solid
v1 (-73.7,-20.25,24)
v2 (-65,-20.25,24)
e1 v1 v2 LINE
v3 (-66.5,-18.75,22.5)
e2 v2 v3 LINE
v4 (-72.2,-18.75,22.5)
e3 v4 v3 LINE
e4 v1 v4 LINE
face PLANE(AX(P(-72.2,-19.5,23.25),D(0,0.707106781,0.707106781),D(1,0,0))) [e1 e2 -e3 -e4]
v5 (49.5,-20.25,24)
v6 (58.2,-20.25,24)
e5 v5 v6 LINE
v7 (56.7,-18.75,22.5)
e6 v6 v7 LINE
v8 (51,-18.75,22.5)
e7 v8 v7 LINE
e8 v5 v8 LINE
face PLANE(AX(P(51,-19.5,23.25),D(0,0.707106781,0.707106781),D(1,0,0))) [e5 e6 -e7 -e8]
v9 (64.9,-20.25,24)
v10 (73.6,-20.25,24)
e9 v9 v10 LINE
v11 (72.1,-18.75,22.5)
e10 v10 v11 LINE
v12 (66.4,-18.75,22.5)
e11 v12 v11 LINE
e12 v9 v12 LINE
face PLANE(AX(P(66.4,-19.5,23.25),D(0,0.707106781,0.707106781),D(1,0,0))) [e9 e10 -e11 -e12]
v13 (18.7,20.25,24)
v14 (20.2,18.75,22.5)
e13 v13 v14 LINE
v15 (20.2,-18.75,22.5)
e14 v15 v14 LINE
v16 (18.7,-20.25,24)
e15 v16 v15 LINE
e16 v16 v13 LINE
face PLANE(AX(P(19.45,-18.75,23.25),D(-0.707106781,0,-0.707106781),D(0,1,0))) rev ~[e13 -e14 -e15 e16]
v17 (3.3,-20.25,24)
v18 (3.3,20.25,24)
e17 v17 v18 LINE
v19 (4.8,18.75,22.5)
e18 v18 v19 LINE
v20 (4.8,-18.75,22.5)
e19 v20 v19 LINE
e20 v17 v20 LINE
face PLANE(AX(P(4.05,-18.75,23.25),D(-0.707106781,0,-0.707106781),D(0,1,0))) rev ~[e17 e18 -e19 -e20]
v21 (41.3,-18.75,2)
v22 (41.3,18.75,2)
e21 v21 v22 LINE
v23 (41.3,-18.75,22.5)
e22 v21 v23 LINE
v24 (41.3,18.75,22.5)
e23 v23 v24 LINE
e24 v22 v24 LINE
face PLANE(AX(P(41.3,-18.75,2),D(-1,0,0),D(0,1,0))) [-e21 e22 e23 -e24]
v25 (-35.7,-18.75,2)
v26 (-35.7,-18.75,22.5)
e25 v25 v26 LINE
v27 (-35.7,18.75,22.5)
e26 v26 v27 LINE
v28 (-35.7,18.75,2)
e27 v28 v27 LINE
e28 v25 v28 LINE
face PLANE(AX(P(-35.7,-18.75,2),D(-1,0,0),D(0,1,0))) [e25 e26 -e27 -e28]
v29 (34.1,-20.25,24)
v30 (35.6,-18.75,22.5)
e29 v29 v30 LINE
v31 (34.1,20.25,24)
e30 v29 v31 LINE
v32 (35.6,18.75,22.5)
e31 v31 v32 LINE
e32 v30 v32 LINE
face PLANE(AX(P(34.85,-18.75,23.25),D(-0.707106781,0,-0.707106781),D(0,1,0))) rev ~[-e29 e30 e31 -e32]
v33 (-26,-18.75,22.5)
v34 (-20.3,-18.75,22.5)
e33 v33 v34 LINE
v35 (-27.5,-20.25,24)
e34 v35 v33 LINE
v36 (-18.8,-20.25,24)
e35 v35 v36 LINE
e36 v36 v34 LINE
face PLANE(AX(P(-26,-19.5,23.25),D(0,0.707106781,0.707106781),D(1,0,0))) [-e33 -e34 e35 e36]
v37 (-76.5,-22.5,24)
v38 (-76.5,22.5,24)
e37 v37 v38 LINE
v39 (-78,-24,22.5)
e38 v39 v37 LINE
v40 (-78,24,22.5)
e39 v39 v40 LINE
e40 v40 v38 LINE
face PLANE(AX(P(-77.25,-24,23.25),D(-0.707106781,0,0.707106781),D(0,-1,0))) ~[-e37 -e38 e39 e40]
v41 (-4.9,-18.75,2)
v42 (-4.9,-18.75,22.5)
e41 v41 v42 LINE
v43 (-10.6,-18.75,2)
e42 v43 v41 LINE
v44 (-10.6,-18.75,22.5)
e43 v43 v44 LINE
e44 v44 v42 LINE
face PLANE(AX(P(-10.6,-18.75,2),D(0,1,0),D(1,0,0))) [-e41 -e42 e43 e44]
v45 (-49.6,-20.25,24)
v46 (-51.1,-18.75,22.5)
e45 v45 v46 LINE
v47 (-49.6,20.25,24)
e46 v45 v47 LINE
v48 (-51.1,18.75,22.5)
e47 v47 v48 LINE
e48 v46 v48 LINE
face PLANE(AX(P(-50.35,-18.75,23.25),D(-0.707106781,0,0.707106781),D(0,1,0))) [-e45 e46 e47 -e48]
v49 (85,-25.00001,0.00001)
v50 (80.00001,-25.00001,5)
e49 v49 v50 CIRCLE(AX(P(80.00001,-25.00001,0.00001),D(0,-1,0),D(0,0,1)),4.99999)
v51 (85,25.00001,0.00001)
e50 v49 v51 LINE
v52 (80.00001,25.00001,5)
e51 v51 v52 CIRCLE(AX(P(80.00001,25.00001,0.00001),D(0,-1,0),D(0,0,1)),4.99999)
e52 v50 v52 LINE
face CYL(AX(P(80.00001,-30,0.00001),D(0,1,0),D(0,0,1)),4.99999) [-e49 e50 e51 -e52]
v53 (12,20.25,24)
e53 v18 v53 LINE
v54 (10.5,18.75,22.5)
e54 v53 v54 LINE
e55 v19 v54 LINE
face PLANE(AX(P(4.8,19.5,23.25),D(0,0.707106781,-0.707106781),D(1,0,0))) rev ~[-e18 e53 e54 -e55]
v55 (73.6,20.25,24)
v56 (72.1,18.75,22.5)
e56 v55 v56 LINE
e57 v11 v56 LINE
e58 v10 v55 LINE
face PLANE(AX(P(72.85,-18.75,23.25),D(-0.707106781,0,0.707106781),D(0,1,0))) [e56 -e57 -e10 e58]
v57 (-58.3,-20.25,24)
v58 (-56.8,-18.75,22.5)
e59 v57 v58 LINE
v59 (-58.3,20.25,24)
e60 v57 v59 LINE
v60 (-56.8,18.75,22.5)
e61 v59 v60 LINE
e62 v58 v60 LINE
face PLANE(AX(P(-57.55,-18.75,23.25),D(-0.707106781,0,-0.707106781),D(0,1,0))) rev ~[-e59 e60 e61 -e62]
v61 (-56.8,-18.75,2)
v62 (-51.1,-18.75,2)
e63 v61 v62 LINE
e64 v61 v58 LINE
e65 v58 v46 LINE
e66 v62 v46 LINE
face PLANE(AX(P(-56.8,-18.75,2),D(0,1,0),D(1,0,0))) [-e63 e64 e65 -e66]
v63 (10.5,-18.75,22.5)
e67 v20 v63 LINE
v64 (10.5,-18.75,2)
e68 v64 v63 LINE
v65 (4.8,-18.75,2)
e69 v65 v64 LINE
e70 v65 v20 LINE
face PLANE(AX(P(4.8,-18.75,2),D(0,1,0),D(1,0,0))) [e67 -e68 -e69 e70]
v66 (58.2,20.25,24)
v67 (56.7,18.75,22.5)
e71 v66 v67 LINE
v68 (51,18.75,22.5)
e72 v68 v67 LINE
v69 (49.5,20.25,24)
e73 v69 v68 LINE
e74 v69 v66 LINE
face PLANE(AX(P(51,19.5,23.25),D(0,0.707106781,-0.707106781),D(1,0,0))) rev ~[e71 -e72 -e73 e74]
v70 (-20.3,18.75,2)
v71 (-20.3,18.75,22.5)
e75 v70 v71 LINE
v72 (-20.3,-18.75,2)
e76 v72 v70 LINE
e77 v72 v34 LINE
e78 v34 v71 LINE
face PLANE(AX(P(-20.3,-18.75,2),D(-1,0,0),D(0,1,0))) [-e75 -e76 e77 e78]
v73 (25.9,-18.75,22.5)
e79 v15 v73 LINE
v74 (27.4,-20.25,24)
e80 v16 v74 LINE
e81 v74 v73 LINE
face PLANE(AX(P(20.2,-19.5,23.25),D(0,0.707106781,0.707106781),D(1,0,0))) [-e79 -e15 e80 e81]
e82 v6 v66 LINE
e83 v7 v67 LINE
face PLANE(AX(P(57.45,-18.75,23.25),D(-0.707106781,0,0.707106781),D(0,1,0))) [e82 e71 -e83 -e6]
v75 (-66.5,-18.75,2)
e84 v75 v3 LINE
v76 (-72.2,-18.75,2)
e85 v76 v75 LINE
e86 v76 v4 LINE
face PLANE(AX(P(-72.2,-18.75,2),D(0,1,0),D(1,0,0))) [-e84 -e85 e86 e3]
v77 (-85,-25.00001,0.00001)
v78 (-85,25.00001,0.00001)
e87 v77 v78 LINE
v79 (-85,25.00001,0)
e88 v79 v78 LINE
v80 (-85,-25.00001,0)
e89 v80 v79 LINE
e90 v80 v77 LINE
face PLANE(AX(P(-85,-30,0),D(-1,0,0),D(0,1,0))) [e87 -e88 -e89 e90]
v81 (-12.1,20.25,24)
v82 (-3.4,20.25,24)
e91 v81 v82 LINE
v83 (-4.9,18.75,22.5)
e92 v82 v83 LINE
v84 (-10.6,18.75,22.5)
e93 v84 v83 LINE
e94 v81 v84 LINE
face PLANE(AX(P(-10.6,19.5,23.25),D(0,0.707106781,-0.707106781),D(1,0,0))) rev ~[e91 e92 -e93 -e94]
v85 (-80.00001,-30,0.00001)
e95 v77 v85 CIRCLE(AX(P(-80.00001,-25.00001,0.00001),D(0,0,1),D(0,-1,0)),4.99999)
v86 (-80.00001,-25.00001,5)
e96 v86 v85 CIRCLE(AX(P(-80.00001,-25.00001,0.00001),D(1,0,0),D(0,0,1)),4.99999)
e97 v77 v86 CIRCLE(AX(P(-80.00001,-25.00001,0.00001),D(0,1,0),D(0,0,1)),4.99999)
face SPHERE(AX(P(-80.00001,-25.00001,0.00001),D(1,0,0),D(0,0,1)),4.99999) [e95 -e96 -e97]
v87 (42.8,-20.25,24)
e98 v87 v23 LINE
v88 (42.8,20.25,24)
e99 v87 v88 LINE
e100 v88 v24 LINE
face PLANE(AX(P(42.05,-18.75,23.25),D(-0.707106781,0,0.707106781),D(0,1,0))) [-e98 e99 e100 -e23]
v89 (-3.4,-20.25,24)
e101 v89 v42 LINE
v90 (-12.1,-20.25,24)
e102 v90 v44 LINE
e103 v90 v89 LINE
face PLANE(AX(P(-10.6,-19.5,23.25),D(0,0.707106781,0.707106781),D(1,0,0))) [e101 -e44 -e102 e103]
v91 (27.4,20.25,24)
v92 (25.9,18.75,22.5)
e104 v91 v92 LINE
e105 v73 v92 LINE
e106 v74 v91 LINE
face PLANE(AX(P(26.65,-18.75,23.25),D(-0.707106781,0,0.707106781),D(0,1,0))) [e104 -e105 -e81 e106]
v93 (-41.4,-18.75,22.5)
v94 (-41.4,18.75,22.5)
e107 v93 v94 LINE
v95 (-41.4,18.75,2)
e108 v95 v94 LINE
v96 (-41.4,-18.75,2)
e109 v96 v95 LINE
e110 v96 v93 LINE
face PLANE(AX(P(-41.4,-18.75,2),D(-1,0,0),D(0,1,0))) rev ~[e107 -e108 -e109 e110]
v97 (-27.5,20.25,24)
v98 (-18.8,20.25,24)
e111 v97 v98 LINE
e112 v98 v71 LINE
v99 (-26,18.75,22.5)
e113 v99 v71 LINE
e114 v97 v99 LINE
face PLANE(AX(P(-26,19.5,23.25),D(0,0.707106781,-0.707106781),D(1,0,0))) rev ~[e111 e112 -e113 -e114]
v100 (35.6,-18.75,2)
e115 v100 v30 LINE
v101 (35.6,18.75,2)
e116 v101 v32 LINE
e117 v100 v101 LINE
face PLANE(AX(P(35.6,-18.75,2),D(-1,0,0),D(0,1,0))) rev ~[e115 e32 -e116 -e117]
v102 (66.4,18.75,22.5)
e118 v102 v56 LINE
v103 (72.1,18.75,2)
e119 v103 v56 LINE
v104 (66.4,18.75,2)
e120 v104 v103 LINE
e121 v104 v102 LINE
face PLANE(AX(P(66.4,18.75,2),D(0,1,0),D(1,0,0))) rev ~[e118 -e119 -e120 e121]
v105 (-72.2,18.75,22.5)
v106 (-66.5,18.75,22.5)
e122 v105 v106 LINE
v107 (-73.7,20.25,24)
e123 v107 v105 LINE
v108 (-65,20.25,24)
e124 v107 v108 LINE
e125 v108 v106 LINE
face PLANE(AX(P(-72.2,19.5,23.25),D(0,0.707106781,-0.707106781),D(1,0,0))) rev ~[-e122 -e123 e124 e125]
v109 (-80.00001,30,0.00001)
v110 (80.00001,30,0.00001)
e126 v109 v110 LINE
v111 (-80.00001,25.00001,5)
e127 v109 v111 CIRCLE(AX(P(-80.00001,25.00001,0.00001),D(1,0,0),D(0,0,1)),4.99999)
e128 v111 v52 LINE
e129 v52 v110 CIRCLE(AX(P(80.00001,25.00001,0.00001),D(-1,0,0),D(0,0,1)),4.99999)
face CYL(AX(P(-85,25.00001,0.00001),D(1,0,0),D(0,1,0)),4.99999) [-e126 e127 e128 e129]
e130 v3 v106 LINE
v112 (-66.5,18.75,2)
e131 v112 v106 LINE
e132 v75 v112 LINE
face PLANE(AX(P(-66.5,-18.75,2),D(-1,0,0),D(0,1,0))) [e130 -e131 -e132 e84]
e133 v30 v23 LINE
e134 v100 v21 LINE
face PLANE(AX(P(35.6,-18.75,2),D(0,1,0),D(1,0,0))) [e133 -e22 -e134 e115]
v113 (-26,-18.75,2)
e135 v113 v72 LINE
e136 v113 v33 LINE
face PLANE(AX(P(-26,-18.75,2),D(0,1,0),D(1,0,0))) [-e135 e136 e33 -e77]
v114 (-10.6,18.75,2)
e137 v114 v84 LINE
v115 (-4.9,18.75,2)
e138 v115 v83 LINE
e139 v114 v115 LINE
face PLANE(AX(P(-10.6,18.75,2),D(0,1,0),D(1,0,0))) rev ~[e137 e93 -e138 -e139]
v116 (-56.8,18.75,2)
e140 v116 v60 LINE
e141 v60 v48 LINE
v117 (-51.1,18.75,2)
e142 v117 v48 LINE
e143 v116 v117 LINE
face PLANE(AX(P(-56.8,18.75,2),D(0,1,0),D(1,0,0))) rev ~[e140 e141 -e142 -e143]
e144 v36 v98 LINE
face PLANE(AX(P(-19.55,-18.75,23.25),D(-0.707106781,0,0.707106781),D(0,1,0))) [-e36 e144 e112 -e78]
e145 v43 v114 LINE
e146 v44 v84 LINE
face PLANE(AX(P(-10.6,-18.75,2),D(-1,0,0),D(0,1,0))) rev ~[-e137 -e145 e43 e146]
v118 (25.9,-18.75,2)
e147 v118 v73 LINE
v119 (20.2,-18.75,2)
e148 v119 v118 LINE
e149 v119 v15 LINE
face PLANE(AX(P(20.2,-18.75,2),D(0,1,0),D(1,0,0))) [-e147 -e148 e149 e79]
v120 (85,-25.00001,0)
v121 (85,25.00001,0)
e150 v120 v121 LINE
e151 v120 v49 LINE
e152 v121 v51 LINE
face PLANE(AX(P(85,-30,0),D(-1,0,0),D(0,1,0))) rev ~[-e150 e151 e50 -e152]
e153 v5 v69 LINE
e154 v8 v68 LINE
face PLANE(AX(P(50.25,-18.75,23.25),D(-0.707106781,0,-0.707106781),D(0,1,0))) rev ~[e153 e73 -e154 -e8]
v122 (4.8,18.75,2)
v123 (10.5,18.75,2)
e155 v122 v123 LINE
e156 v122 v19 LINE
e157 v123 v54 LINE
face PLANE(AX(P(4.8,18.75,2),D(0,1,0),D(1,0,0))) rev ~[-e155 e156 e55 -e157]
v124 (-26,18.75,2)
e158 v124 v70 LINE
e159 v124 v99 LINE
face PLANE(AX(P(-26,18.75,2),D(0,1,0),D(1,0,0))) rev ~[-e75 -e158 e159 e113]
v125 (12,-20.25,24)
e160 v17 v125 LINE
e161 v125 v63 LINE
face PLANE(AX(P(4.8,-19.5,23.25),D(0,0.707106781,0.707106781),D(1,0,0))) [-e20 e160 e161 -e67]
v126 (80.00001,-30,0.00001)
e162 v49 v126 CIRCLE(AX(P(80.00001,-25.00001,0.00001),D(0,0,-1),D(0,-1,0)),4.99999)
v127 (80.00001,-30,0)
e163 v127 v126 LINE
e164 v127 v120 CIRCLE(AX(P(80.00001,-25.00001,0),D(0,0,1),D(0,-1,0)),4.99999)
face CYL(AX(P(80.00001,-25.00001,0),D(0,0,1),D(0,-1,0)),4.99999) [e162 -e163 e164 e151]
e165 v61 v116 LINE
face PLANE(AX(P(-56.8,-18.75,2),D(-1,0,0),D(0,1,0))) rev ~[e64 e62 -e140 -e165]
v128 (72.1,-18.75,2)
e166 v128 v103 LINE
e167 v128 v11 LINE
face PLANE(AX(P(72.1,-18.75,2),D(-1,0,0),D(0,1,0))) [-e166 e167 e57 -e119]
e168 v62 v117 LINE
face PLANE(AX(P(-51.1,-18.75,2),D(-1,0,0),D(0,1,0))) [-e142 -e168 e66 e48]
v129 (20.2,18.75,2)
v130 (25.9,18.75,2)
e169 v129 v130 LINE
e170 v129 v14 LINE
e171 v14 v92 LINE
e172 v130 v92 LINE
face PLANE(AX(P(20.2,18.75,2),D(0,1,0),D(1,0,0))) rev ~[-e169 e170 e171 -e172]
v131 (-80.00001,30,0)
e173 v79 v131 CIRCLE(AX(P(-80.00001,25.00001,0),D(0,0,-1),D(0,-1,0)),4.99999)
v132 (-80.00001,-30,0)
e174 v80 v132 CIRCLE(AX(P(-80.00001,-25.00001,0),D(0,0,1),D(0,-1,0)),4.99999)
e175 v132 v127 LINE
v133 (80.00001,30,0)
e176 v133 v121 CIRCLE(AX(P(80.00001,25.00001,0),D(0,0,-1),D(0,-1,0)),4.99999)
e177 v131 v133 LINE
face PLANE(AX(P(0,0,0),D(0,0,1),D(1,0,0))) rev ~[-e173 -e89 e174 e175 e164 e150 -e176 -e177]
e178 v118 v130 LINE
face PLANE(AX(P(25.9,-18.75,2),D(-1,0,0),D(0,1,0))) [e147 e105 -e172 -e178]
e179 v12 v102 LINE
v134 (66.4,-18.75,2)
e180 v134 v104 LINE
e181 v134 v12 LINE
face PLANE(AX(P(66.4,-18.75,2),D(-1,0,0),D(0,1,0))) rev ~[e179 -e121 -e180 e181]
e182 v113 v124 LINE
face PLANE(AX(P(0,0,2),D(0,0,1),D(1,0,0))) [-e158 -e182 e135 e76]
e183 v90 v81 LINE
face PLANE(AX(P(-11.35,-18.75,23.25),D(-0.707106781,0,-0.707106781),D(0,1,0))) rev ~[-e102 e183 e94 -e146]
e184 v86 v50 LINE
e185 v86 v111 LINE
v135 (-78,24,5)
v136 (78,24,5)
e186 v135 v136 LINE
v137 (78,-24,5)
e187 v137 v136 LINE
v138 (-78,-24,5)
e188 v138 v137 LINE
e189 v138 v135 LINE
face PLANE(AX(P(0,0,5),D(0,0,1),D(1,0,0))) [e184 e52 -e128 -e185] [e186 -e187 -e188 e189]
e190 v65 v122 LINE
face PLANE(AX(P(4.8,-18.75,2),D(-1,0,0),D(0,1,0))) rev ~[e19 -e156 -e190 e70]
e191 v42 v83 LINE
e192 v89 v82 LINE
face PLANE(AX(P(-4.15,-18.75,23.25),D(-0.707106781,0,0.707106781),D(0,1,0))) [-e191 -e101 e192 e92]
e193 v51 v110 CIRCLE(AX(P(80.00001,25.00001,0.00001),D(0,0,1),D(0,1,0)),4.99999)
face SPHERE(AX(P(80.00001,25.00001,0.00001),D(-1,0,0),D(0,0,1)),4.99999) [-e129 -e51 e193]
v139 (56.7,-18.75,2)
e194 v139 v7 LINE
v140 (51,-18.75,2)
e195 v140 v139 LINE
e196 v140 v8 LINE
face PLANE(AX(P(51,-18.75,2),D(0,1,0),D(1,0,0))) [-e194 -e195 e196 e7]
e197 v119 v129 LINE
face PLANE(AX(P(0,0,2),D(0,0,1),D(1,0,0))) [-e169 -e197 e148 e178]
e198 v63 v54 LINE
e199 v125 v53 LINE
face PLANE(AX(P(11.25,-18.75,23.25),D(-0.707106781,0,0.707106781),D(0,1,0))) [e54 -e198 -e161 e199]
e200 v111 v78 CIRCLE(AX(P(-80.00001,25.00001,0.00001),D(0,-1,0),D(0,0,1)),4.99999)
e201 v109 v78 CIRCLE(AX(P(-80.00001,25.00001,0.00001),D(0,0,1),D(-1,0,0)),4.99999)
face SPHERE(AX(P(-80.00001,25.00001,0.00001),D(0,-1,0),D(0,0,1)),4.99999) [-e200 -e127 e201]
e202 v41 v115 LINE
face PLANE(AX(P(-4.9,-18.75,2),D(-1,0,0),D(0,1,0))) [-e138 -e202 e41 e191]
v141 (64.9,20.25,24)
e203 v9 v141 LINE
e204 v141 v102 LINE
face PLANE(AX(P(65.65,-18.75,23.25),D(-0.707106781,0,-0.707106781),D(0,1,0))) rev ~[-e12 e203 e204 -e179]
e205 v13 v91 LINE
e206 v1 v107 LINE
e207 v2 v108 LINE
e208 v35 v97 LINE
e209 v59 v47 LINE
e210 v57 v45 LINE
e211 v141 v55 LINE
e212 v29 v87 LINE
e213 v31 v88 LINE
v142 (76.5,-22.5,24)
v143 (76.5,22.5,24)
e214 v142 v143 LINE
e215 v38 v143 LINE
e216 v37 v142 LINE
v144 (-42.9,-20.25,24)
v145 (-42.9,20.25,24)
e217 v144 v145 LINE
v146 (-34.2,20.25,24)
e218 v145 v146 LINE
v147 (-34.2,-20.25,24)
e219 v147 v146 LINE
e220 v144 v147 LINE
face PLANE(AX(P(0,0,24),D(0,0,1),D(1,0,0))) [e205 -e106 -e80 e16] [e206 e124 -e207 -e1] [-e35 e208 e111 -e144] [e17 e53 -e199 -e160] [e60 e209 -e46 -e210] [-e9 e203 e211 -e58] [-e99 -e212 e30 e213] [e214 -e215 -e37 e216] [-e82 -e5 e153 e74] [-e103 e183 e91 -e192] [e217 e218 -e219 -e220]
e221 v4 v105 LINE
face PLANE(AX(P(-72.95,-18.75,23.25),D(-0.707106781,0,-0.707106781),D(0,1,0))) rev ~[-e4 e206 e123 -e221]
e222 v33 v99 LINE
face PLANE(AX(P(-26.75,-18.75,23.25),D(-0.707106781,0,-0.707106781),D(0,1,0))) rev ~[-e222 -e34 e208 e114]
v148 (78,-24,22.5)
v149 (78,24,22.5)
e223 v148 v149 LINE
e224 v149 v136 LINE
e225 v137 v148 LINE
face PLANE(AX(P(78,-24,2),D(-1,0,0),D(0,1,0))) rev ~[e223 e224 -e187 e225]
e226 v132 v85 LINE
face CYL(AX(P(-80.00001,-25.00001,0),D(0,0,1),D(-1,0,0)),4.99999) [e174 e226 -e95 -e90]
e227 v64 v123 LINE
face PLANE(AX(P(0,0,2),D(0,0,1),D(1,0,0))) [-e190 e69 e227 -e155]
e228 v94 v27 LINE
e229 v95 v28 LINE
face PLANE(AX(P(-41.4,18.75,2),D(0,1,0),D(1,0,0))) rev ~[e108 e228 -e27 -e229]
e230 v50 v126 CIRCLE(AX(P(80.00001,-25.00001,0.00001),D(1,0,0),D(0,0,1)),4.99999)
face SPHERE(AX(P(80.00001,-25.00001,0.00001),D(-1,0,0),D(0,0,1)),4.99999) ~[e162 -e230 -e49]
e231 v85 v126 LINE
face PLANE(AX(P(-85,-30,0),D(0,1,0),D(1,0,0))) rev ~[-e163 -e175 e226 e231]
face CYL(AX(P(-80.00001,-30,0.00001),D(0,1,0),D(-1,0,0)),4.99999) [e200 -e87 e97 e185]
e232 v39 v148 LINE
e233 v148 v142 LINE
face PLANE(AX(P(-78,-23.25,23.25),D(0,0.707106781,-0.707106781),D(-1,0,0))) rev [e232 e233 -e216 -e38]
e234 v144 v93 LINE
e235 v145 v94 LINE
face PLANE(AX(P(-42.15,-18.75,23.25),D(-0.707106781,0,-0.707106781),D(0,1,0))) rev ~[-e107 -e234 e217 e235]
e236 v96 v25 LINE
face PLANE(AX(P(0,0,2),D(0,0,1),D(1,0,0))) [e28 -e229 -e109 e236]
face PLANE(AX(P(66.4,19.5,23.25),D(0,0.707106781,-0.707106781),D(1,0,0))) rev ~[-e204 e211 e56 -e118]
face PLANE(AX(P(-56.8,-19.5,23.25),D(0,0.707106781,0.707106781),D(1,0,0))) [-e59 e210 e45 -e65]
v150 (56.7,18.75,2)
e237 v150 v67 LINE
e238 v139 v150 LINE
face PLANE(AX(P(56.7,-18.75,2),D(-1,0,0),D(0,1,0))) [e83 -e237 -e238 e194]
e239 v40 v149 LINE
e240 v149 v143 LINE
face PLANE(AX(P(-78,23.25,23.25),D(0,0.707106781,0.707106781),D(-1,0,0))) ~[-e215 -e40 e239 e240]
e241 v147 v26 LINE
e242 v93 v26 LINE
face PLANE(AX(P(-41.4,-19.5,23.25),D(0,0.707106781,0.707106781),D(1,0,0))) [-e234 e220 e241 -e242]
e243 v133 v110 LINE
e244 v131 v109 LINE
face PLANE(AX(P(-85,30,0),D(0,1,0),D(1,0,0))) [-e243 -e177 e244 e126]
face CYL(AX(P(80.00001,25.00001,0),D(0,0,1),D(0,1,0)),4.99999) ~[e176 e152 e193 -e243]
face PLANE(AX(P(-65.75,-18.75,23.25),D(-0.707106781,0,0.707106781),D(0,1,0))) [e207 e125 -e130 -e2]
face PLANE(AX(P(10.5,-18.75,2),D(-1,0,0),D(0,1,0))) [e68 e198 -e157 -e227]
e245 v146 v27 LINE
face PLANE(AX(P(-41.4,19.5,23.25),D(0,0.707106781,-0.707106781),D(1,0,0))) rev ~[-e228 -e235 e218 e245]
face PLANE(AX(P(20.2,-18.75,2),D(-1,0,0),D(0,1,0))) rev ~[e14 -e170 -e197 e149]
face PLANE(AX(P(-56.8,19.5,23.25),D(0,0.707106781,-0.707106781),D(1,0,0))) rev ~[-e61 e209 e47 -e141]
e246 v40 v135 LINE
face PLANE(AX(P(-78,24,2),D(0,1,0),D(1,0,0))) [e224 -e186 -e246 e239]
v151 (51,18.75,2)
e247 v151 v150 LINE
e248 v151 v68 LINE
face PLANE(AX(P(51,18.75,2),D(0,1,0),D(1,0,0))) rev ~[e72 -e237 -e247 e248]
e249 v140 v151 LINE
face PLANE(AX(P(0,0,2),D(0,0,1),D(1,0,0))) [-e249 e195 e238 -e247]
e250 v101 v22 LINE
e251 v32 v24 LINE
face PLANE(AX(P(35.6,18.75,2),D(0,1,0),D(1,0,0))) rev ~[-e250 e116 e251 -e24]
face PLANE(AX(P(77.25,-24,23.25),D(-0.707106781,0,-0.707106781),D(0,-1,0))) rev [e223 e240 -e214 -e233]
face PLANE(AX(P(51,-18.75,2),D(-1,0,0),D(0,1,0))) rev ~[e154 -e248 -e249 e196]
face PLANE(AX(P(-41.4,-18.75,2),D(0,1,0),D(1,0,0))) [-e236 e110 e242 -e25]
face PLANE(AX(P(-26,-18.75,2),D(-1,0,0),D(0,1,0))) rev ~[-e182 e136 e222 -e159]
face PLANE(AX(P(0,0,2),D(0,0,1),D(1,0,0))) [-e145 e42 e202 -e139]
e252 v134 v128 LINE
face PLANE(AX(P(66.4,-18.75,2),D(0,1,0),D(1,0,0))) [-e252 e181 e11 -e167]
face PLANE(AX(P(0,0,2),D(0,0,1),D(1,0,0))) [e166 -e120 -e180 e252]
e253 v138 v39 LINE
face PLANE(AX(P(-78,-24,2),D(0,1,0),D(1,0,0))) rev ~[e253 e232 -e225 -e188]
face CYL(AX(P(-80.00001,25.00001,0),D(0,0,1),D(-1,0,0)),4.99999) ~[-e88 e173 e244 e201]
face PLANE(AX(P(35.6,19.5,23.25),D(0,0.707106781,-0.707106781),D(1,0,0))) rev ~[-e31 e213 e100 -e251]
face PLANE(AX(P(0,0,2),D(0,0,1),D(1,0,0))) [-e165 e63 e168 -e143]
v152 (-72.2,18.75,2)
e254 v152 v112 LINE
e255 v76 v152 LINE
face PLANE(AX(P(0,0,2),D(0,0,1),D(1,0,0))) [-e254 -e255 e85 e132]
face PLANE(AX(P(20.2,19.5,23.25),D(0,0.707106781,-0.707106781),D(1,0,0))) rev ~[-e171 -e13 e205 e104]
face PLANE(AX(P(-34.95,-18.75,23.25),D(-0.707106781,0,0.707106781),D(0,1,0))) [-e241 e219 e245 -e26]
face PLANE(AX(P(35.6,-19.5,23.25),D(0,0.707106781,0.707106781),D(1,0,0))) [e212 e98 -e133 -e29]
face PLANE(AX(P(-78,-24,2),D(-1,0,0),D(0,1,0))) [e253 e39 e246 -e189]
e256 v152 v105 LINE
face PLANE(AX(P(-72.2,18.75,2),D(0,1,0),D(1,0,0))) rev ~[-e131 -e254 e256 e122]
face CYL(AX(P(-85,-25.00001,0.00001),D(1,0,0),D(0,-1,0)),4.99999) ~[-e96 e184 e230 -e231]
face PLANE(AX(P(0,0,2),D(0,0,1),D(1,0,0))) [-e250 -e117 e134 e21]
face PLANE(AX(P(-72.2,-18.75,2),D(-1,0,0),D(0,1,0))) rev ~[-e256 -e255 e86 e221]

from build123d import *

# Parameters (mm, degrees)
F0_W     = 156
F0_H     = 48
F1_DEPTH = 2
F2_W     = 156
F2_H     = 48
F2_W_2   = 5.7
F2_H_2   = 37.5
F3_DEPTH = 22
F0_W_2   = 170
F0_H_2   = 60
F4_DEPTH = 5
F5_R     = 4.99999
F6_SIZE  = 1.5


# Not quite as in the source:
# - a fillet or chamfer is up to 0.001 mm smaller than in the source, because OpenCascade refuses the exact size


with BuildPart() as f1:
    # F0 (on Top) → F1 (new body)
    with BuildSketch(Plane.XY):
        Rectangle(F0_W, F0_H)
    extrude(amount=F1_DEPTH)

    # F2 (on face) → F3 (join)
    with BuildSketch(Plane.XY.offset(2)):
        Rectangle(F2_W, F2_H)
        with Locations((-69.35, 0)):
            Rectangle(F2_W_2, F2_H_2, mode=Mode.SUBTRACT)
        with Locations((-53.95, 0)):
            Rectangle(F2_W_2, F2_H_2, mode=Mode.SUBTRACT)
        with Locations((-38.55, 0)):
            Rectangle(F2_W_2, F2_H_2, mode=Mode.SUBTRACT)
        with Locations((-23.15, 0)):
            Rectangle(F2_W_2, F2_H_2, mode=Mode.SUBTRACT)
        with Locations((-7.75, 0)):
            Rectangle(F2_W_2, F2_H_2, mode=Mode.SUBTRACT)
        with Locations((7.65, 0)):
            Rectangle(F2_W_2, F2_H_2, mode=Mode.SUBTRACT)
        with Locations((23.05, 0)):
            Rectangle(F2_W_2, F2_H_2, mode=Mode.SUBTRACT)
        with Locations((38.45, 0)):
            Rectangle(F2_W_2, F2_H_2, mode=Mode.SUBTRACT)
        with Locations((53.85, 0)):
            Rectangle(F2_W_2, F2_H_2, mode=Mode.SUBTRACT)
        with Locations((69.25, 0)):
            Rectangle(F2_W_2, F2_H_2, mode=Mode.SUBTRACT)
    extrude(amount=F3_DEPTH)

    # F0 (on Top) → F4 (join)
    with BuildSketch(Plane.XY):
        Rectangle(F0_W_2, F0_H_2)
        Rectangle(F0_W, F0_H, mode=Mode.SUBTRACT)
    extrude(amount=F4_DEPTH)

    # F5 (radius 5 in the source; OpenCascade refuses exactly that, so slightly less here)
    f5_edges = [f1.edges().sort_by_distance(p)[0] for p in [
        (0, -30, 5),
        (-85, 0, 5),
        (0, 30, 5),
        (85, 0, 5),
        (85, -30, 2.5),
        (85, 30, 2.5),
        (-85, -30, 2.5),
        (-85, 30, 2.5),
    ]]
    fillet(f5_edges, radius=F5_R)

    # F6
    f6_edges = [f1.edges().sort_by_distance(p)[0] for p in [
        (0, -24, 24),
        (-78, 0, 24),
        (0, 24, 24),
        (78, 0, 24),
        (-72.2, 0, 24),
        (-66.5, 0, 24),
        (-69.35, -18.75, 24),
        (-69.35, 18.75, 24),
        (-53.95, -18.75, 24),
        (-51.1, 0, 24),
        (-56.8, 0, 24),
        (-53.95, 18.75, 24),
        (-38.55, 18.75, 24),
        (-41.4, 0, 24),
        (-38.55, -18.75, 24),
        (-35.7, 0, 24),
        (-26, 0, 24),
        (-20.3, 0, 24),
        (-23.15, -18.75, 24),
        (-23.15, 18.75, 24),
        (-10.6, 0, 24),
        (-7.75, 18.75, 24),
        (-4.9, 0, 24),
        (-7.75, -18.75, 24),
        (7.65, -18.75, 24),
        (4.8, 0, 24),
        (10.5, 0, 24),
        (7.65, 18.75, 24),
        (20.2, 0, 24),
        (23.05, 18.75, 24),
        (25.9, 0, 24),
        (23.05, -18.75, 24),
        (38.45, -18.75, 24),
        (35.6, 0, 24),
        (41.3, 0, 24),
        (38.45, 18.75, 24),
        (51, 0, 24),
        (53.85, -18.75, 24),
        (56.7, 0, 24),
        (53.85, 18.75, 24),
        (66.4, 0, 24),
        (69.25, -18.75, 24),
        (72.1, 0, 24),
        (69.25, 18.75, 24),
    ]]
    chamfer(f6_edges, length=F6_SIZE)


solid = f1.part
